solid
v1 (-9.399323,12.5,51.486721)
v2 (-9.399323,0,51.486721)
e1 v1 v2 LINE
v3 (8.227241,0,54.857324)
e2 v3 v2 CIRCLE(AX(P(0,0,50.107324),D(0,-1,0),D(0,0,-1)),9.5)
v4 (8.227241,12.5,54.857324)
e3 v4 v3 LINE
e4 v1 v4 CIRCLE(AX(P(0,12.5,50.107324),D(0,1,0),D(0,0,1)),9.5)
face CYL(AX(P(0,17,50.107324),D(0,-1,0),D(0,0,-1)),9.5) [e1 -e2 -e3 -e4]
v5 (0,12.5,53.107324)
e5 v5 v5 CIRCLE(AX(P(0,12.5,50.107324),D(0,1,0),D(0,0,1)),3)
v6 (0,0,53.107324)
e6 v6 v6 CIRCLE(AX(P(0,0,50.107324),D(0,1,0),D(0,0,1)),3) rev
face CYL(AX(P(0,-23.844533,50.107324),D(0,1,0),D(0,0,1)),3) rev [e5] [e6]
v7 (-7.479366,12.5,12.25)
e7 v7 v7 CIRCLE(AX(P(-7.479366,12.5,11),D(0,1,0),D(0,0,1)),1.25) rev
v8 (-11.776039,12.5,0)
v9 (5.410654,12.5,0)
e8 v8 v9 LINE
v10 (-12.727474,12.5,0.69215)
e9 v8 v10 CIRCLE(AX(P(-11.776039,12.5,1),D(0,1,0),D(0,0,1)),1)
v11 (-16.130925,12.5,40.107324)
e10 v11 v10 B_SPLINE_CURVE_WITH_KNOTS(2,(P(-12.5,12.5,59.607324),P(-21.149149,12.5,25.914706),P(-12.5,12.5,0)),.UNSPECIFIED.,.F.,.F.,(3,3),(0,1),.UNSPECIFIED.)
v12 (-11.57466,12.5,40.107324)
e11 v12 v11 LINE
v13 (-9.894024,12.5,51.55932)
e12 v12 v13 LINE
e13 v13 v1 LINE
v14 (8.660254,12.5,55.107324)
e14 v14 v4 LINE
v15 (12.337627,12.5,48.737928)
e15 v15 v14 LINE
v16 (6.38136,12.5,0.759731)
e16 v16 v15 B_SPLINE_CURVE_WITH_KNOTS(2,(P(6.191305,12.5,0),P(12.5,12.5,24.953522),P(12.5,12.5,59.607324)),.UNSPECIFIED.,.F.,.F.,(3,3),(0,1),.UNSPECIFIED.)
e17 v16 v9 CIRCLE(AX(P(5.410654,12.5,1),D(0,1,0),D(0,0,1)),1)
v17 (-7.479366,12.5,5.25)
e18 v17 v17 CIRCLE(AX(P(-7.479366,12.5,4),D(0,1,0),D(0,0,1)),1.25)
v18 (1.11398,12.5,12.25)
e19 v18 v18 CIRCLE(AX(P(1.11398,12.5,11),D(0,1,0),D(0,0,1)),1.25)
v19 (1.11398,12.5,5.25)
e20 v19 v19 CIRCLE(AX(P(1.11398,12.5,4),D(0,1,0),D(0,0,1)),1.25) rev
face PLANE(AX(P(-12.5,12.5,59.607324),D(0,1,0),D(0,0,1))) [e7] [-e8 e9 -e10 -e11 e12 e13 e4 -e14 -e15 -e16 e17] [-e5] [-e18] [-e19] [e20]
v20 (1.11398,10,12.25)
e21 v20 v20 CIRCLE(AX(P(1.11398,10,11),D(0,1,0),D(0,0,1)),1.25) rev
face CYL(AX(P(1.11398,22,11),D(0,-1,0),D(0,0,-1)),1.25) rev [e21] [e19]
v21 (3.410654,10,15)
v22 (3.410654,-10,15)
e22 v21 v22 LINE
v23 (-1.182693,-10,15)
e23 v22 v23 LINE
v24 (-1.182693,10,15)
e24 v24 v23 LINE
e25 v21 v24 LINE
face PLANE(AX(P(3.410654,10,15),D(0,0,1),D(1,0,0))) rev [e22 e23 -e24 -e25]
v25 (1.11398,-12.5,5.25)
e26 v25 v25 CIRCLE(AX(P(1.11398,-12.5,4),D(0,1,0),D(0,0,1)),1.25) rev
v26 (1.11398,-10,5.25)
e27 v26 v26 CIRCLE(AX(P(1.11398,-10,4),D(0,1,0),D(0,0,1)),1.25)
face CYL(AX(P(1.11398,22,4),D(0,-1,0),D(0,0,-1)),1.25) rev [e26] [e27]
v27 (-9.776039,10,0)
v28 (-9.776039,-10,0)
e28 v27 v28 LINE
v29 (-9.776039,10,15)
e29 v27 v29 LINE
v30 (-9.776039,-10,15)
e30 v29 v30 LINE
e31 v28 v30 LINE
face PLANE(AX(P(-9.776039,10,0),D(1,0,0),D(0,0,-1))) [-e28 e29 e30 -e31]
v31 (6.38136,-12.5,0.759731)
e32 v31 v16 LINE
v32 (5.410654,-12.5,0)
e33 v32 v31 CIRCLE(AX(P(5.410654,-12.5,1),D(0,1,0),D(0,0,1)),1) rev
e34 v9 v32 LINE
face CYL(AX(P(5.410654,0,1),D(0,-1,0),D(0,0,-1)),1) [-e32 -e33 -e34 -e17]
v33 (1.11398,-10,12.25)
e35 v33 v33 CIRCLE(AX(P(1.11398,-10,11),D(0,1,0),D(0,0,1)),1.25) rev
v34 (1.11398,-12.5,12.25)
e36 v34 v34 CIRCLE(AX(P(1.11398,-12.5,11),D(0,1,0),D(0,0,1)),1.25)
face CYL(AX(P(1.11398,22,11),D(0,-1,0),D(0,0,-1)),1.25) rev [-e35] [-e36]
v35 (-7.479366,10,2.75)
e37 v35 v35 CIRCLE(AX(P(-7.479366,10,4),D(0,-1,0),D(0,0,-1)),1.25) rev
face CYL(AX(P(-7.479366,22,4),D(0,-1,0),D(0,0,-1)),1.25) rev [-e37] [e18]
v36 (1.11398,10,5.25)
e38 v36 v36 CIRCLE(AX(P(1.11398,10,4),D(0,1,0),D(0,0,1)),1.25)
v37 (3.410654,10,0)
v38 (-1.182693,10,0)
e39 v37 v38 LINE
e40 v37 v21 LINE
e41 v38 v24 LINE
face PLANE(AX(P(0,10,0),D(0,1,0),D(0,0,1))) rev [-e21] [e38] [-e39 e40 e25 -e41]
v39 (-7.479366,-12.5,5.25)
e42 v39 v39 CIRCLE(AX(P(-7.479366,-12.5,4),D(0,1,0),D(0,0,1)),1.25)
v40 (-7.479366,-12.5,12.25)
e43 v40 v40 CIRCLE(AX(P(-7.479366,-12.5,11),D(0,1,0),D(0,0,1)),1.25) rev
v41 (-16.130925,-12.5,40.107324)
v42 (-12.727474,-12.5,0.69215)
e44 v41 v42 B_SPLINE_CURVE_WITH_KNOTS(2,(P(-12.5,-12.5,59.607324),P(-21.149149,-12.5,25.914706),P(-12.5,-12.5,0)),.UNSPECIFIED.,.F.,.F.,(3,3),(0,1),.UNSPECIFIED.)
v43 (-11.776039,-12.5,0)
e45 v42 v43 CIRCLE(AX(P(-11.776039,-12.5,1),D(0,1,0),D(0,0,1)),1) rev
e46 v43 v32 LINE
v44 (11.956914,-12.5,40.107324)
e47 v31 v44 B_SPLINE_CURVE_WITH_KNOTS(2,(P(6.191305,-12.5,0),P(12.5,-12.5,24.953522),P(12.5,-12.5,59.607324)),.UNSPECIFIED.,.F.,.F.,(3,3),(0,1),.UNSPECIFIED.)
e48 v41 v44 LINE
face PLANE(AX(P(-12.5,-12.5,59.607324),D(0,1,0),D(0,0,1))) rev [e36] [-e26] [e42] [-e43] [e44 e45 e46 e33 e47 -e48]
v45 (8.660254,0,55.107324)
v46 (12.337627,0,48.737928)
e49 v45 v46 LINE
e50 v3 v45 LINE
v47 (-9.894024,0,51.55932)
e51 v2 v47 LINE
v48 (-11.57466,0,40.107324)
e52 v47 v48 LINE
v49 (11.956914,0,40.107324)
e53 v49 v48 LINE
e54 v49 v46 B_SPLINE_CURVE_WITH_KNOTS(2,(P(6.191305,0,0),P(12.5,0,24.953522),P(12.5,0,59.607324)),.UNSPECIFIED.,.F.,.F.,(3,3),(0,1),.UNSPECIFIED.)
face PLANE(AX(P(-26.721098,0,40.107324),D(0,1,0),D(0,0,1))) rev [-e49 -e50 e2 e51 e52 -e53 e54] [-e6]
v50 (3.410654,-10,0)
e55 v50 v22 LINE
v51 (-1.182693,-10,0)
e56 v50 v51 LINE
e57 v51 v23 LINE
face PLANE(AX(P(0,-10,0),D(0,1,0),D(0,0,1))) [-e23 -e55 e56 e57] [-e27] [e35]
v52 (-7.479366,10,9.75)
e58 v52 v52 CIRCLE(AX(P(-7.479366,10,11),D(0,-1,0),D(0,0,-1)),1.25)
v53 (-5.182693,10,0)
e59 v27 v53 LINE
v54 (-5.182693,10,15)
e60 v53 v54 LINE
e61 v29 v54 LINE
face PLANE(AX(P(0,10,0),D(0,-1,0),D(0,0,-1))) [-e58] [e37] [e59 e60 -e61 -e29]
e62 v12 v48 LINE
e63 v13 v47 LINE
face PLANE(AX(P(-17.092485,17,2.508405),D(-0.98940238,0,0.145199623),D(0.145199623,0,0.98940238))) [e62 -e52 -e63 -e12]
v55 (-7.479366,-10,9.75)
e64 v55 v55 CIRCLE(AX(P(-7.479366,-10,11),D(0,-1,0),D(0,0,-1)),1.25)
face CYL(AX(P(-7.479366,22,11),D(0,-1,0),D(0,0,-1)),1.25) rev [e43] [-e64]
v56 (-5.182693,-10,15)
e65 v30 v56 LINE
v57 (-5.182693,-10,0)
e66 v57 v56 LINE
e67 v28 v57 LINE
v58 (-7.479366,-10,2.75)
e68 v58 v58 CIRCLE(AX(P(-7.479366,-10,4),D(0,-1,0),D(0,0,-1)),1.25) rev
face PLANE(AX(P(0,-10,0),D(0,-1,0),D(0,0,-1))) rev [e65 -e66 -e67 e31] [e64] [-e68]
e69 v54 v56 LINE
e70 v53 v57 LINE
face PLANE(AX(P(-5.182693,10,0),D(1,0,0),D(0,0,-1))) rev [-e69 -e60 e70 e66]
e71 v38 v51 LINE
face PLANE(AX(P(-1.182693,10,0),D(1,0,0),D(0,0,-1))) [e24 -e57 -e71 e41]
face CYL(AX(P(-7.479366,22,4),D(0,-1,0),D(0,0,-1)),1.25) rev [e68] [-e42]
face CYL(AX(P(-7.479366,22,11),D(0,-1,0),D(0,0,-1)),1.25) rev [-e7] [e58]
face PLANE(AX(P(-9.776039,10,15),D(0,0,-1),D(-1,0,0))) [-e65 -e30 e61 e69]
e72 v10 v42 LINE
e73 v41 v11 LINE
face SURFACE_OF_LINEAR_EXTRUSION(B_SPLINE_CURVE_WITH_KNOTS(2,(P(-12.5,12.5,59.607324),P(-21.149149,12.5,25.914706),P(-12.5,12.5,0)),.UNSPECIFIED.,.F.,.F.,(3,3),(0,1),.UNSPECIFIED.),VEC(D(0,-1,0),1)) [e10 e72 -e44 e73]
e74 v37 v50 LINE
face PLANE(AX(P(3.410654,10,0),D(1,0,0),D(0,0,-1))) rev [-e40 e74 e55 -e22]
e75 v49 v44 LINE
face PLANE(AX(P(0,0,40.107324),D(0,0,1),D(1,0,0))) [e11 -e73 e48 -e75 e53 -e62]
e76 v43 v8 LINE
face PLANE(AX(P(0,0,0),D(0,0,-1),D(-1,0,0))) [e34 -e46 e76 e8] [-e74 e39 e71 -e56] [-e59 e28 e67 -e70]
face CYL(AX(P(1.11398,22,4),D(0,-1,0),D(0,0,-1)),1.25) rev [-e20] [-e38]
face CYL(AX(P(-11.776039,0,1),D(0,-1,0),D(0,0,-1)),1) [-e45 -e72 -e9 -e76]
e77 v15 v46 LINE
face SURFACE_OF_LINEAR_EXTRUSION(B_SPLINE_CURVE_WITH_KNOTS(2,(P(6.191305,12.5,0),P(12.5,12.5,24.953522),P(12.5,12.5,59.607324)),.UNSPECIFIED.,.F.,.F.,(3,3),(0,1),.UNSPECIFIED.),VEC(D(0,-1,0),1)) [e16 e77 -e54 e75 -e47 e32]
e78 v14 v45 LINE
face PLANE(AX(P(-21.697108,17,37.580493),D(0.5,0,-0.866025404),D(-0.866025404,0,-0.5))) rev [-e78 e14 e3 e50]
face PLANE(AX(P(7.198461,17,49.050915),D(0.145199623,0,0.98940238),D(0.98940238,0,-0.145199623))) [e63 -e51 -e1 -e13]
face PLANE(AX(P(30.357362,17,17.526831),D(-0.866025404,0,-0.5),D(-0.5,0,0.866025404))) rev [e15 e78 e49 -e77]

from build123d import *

# Parameters (mm, degrees)
SKETCH_1_W               = 25
SKETCH_1_H               = 25
EXTRUDE_1_DEPTH          = 59.607324229
EXTRUDE_2_DEPTH          = 25
SKETCH_6_3_OUTSIDE_W     = 45.521
SKETCH_6_3_OUTSIDE_H     = 75.803
CUT_EXTRUDE_4_DEPTH      = 25
SKETCH_2_R               = 3
CUT_EXTRUDE_1_DEPTH      = 36.344532851
SKETCH_4_W               = 45.98037926
SKETCH_4_H               = 12.5
CUT_EXTRUDE_2_DEPTH      = 19.5
CUT_EXTRUDE_5_DEPTH      = 17
FILLET_1_R               = 1
CUT_EXTRUDE_6_DEPTH      = 22
CUT_EXTRUDE_6_DEPTH_BACK = 20
SKETCH_8_R               = 1.25
CUT_EXTRUDE_7_DEPTH      = 10
CUT_EXTRUDE_7_DEPTH_BACK = 10
SKETCH_8_3_W             = 4.593346614
SKETCH_8_3_H             = 15


with BuildPart() as part:
    # 스케치1 → 보스-돌출1 (new body)
    with BuildSketch(Plane.XY):
        Rectangle(SKETCH_1_W, SKETCH_1_H)
    extrude(amount=EXTRUDE_1_DEPTH)

    # 스케치6 → 보스-돌출2 (add)
    with BuildSketch(Plane.XZ.offset(12.5)):
        with BuildLine():
            add(Edge.make_bspline(
                [(-12.5, 59.607324229), (-21.149148663, 25.914705571), (-12.5, 0)],
                knots=[0, 0, 0, 1, 1, 1], degree=2))
            Line((-12.5, 0), (-12.5, 59.607324229))
        make_face()
    extrude(amount=-EXTRUDE_2_DEPTH)

    # 스케치6<3> outside → 컷-돌출4 (cut)
    with BuildSketch(Plane.XZ.offset(12.5)):
        with Locations((-2.1625, 29.8035)):
            Rectangle(SKETCH_6_3_OUTSIDE_W, SKETCH_6_3_OUTSIDE_H)
        with BuildLine():
            Line((-12.5, 0), (6.191304912, 0))
            add(Edge.make_bspline(
                [(6.191304912, 0), (12.5, 24.95352193), (12.5, 59.607324229)],
                knots=[0, 0, 0, 1, 1, 1], degree=2))
            Line((12.5, 59.607324229), (-12.5, 59.607324229))
            add(Edge.make_bspline(
                [(-12.5, 59.607324229), (-21.149148663, 25.914705571), (-12.5, 0)],
                knots=[0, 0, 0, 1, 1, 1], degree=2))
        make_face(mode=Mode.SUBTRACT)
    extrude(amount=-CUT_EXTRUDE_4_DEPTH, mode=Mode.SUBTRACT)

    # 스케치2 → 컷-돌출1 (cut)
    with BuildSketch(Plane(origin=(0, 12.5, 0), x_dir=(1, 0, 0), z_dir=(0, 1, 0))):
        with Locations((0, -50.107324229)):
            Circle(SKETCH_2_R)
    extrude(amount=-CUT_EXTRUDE_1_DEPTH, mode=Mode.SUBTRACT)

    # 스케치4 → 컷-돌출2 (cut)
    with BuildSketch(Plane.XY.offset(59.607324229)):
        with Locations((-3.730908459, -6.25)):
            Rectangle(SKETCH_4_W, SKETCH_4_H)
    extrude(amount=-CUT_EXTRUDE_2_DEPTH, mode=Mode.SUBTRACT)

    # 스케치7 → 컷-돌출5 (cut)
    with BuildSketch(Plane.XZ):
        with BuildLine():
            ThreePointArc((0, 59.607324229), (4.75, 58.334565565), (8.227241336, 54.857324229))
            Line((8.227241336, 54.857324229), (8.660254038, 55.107324229))
            Line((8.660254038, 55.107324229), (12.337626898, 48.737927596))
            add(Edge.make_bspline(
                [(12.337626898, 48.737927596), (12.5, 54.047793075), (12.5, 59.607324229)],
                knots=[0, 0, 0, 1, 1, 1], degree=2))
            Line((12.5, 59.607324229), (0, 59.607324229))
        make_face()
        with BuildLine():
            Line((-9.8940238, 51.559320455), (-9.39932261, 51.486720644))
            ThreePointArc((-9.39932261, 51.486720644), (-6.21070584, 57.296005121), (0, 59.607324229))
            Line((0, 59.607324229), (-12.5, 59.607324229))
            add(Edge.make_bspline(
                [(-12.5, 59.607324229), (-15.09259901, 49.507896739), (-16.130924903, 40.107324229)],
                knots=[0, 0, 0, 1, 1, 1], degree=2))
            Line((-16.130924903, 40.107324229), (-11.574660076, 40.107324229))
            Line((-11.574660076, 40.107324229), (-9.8940238, 51.559320455))
        make_face()
    extrude(amount=-CUT_EXTRUDE_5_DEPTH, mode=Mode.SUBTRACT)

    # 필렛1
    fillet_1_edges = [part.edges().sort_by_distance(p)[0] for p in [
        (6.191304912, 0, 0),
        (-12.5, 0, 0),
    ]]
    fillet(fillet_1_edges, radius=FILLET_1_R)

    # 스케치8 → 컷-돌출6 (cut, two sides: drawn at the far end of the back side and taken through both)
    with BuildSketch(Plane(origin=(0, 0, 0), x_dir=(1, 0, 0), z_dir=(0, 1, 0)).offset(-CUT_EXTRUDE_6_DEPTH_BACK)):
        with Locations((1.11398045, -4)):
            Circle(SKETCH_8_R)
        with Locations((1.11398045, -11)):
            Circle(SKETCH_8_R)
        with Locations((-7.479366164, -4)):
            Circle(SKETCH_8_R)
        with Locations((-7.479366164, -11)):
            Circle(SKETCH_8_R)
    extrude(amount=CUT_EXTRUDE_6_DEPTH + CUT_EXTRUDE_6_DEPTH_BACK, mode=Mode.SUBTRACT)

    # 스케치8<3> → 컷-돌출7 (cut, two sides: drawn at the far end of the back side and taken through both)
    with BuildSketch(Plane(origin=(0, 0, 0), x_dir=(1, 0, 0), z_dir=(0, 1, 0)).offset(-CUT_EXTRUDE_7_DEPTH_BACK)):
        with Locations((-7.479366164, -7.5)):
            Rectangle(SKETCH_8_3_W, SKETCH_8_3_H)
        with Locations((1.11398045, -7.5)):
            Rectangle(SKETCH_8_3_W, SKETCH_8_3_H)
    extrude(amount=CUT_EXTRUDE_7_DEPTH + CUT_EXTRUDE_7_DEPTH_BACK, mode=Mode.SUBTRACT)


solid = part.part
